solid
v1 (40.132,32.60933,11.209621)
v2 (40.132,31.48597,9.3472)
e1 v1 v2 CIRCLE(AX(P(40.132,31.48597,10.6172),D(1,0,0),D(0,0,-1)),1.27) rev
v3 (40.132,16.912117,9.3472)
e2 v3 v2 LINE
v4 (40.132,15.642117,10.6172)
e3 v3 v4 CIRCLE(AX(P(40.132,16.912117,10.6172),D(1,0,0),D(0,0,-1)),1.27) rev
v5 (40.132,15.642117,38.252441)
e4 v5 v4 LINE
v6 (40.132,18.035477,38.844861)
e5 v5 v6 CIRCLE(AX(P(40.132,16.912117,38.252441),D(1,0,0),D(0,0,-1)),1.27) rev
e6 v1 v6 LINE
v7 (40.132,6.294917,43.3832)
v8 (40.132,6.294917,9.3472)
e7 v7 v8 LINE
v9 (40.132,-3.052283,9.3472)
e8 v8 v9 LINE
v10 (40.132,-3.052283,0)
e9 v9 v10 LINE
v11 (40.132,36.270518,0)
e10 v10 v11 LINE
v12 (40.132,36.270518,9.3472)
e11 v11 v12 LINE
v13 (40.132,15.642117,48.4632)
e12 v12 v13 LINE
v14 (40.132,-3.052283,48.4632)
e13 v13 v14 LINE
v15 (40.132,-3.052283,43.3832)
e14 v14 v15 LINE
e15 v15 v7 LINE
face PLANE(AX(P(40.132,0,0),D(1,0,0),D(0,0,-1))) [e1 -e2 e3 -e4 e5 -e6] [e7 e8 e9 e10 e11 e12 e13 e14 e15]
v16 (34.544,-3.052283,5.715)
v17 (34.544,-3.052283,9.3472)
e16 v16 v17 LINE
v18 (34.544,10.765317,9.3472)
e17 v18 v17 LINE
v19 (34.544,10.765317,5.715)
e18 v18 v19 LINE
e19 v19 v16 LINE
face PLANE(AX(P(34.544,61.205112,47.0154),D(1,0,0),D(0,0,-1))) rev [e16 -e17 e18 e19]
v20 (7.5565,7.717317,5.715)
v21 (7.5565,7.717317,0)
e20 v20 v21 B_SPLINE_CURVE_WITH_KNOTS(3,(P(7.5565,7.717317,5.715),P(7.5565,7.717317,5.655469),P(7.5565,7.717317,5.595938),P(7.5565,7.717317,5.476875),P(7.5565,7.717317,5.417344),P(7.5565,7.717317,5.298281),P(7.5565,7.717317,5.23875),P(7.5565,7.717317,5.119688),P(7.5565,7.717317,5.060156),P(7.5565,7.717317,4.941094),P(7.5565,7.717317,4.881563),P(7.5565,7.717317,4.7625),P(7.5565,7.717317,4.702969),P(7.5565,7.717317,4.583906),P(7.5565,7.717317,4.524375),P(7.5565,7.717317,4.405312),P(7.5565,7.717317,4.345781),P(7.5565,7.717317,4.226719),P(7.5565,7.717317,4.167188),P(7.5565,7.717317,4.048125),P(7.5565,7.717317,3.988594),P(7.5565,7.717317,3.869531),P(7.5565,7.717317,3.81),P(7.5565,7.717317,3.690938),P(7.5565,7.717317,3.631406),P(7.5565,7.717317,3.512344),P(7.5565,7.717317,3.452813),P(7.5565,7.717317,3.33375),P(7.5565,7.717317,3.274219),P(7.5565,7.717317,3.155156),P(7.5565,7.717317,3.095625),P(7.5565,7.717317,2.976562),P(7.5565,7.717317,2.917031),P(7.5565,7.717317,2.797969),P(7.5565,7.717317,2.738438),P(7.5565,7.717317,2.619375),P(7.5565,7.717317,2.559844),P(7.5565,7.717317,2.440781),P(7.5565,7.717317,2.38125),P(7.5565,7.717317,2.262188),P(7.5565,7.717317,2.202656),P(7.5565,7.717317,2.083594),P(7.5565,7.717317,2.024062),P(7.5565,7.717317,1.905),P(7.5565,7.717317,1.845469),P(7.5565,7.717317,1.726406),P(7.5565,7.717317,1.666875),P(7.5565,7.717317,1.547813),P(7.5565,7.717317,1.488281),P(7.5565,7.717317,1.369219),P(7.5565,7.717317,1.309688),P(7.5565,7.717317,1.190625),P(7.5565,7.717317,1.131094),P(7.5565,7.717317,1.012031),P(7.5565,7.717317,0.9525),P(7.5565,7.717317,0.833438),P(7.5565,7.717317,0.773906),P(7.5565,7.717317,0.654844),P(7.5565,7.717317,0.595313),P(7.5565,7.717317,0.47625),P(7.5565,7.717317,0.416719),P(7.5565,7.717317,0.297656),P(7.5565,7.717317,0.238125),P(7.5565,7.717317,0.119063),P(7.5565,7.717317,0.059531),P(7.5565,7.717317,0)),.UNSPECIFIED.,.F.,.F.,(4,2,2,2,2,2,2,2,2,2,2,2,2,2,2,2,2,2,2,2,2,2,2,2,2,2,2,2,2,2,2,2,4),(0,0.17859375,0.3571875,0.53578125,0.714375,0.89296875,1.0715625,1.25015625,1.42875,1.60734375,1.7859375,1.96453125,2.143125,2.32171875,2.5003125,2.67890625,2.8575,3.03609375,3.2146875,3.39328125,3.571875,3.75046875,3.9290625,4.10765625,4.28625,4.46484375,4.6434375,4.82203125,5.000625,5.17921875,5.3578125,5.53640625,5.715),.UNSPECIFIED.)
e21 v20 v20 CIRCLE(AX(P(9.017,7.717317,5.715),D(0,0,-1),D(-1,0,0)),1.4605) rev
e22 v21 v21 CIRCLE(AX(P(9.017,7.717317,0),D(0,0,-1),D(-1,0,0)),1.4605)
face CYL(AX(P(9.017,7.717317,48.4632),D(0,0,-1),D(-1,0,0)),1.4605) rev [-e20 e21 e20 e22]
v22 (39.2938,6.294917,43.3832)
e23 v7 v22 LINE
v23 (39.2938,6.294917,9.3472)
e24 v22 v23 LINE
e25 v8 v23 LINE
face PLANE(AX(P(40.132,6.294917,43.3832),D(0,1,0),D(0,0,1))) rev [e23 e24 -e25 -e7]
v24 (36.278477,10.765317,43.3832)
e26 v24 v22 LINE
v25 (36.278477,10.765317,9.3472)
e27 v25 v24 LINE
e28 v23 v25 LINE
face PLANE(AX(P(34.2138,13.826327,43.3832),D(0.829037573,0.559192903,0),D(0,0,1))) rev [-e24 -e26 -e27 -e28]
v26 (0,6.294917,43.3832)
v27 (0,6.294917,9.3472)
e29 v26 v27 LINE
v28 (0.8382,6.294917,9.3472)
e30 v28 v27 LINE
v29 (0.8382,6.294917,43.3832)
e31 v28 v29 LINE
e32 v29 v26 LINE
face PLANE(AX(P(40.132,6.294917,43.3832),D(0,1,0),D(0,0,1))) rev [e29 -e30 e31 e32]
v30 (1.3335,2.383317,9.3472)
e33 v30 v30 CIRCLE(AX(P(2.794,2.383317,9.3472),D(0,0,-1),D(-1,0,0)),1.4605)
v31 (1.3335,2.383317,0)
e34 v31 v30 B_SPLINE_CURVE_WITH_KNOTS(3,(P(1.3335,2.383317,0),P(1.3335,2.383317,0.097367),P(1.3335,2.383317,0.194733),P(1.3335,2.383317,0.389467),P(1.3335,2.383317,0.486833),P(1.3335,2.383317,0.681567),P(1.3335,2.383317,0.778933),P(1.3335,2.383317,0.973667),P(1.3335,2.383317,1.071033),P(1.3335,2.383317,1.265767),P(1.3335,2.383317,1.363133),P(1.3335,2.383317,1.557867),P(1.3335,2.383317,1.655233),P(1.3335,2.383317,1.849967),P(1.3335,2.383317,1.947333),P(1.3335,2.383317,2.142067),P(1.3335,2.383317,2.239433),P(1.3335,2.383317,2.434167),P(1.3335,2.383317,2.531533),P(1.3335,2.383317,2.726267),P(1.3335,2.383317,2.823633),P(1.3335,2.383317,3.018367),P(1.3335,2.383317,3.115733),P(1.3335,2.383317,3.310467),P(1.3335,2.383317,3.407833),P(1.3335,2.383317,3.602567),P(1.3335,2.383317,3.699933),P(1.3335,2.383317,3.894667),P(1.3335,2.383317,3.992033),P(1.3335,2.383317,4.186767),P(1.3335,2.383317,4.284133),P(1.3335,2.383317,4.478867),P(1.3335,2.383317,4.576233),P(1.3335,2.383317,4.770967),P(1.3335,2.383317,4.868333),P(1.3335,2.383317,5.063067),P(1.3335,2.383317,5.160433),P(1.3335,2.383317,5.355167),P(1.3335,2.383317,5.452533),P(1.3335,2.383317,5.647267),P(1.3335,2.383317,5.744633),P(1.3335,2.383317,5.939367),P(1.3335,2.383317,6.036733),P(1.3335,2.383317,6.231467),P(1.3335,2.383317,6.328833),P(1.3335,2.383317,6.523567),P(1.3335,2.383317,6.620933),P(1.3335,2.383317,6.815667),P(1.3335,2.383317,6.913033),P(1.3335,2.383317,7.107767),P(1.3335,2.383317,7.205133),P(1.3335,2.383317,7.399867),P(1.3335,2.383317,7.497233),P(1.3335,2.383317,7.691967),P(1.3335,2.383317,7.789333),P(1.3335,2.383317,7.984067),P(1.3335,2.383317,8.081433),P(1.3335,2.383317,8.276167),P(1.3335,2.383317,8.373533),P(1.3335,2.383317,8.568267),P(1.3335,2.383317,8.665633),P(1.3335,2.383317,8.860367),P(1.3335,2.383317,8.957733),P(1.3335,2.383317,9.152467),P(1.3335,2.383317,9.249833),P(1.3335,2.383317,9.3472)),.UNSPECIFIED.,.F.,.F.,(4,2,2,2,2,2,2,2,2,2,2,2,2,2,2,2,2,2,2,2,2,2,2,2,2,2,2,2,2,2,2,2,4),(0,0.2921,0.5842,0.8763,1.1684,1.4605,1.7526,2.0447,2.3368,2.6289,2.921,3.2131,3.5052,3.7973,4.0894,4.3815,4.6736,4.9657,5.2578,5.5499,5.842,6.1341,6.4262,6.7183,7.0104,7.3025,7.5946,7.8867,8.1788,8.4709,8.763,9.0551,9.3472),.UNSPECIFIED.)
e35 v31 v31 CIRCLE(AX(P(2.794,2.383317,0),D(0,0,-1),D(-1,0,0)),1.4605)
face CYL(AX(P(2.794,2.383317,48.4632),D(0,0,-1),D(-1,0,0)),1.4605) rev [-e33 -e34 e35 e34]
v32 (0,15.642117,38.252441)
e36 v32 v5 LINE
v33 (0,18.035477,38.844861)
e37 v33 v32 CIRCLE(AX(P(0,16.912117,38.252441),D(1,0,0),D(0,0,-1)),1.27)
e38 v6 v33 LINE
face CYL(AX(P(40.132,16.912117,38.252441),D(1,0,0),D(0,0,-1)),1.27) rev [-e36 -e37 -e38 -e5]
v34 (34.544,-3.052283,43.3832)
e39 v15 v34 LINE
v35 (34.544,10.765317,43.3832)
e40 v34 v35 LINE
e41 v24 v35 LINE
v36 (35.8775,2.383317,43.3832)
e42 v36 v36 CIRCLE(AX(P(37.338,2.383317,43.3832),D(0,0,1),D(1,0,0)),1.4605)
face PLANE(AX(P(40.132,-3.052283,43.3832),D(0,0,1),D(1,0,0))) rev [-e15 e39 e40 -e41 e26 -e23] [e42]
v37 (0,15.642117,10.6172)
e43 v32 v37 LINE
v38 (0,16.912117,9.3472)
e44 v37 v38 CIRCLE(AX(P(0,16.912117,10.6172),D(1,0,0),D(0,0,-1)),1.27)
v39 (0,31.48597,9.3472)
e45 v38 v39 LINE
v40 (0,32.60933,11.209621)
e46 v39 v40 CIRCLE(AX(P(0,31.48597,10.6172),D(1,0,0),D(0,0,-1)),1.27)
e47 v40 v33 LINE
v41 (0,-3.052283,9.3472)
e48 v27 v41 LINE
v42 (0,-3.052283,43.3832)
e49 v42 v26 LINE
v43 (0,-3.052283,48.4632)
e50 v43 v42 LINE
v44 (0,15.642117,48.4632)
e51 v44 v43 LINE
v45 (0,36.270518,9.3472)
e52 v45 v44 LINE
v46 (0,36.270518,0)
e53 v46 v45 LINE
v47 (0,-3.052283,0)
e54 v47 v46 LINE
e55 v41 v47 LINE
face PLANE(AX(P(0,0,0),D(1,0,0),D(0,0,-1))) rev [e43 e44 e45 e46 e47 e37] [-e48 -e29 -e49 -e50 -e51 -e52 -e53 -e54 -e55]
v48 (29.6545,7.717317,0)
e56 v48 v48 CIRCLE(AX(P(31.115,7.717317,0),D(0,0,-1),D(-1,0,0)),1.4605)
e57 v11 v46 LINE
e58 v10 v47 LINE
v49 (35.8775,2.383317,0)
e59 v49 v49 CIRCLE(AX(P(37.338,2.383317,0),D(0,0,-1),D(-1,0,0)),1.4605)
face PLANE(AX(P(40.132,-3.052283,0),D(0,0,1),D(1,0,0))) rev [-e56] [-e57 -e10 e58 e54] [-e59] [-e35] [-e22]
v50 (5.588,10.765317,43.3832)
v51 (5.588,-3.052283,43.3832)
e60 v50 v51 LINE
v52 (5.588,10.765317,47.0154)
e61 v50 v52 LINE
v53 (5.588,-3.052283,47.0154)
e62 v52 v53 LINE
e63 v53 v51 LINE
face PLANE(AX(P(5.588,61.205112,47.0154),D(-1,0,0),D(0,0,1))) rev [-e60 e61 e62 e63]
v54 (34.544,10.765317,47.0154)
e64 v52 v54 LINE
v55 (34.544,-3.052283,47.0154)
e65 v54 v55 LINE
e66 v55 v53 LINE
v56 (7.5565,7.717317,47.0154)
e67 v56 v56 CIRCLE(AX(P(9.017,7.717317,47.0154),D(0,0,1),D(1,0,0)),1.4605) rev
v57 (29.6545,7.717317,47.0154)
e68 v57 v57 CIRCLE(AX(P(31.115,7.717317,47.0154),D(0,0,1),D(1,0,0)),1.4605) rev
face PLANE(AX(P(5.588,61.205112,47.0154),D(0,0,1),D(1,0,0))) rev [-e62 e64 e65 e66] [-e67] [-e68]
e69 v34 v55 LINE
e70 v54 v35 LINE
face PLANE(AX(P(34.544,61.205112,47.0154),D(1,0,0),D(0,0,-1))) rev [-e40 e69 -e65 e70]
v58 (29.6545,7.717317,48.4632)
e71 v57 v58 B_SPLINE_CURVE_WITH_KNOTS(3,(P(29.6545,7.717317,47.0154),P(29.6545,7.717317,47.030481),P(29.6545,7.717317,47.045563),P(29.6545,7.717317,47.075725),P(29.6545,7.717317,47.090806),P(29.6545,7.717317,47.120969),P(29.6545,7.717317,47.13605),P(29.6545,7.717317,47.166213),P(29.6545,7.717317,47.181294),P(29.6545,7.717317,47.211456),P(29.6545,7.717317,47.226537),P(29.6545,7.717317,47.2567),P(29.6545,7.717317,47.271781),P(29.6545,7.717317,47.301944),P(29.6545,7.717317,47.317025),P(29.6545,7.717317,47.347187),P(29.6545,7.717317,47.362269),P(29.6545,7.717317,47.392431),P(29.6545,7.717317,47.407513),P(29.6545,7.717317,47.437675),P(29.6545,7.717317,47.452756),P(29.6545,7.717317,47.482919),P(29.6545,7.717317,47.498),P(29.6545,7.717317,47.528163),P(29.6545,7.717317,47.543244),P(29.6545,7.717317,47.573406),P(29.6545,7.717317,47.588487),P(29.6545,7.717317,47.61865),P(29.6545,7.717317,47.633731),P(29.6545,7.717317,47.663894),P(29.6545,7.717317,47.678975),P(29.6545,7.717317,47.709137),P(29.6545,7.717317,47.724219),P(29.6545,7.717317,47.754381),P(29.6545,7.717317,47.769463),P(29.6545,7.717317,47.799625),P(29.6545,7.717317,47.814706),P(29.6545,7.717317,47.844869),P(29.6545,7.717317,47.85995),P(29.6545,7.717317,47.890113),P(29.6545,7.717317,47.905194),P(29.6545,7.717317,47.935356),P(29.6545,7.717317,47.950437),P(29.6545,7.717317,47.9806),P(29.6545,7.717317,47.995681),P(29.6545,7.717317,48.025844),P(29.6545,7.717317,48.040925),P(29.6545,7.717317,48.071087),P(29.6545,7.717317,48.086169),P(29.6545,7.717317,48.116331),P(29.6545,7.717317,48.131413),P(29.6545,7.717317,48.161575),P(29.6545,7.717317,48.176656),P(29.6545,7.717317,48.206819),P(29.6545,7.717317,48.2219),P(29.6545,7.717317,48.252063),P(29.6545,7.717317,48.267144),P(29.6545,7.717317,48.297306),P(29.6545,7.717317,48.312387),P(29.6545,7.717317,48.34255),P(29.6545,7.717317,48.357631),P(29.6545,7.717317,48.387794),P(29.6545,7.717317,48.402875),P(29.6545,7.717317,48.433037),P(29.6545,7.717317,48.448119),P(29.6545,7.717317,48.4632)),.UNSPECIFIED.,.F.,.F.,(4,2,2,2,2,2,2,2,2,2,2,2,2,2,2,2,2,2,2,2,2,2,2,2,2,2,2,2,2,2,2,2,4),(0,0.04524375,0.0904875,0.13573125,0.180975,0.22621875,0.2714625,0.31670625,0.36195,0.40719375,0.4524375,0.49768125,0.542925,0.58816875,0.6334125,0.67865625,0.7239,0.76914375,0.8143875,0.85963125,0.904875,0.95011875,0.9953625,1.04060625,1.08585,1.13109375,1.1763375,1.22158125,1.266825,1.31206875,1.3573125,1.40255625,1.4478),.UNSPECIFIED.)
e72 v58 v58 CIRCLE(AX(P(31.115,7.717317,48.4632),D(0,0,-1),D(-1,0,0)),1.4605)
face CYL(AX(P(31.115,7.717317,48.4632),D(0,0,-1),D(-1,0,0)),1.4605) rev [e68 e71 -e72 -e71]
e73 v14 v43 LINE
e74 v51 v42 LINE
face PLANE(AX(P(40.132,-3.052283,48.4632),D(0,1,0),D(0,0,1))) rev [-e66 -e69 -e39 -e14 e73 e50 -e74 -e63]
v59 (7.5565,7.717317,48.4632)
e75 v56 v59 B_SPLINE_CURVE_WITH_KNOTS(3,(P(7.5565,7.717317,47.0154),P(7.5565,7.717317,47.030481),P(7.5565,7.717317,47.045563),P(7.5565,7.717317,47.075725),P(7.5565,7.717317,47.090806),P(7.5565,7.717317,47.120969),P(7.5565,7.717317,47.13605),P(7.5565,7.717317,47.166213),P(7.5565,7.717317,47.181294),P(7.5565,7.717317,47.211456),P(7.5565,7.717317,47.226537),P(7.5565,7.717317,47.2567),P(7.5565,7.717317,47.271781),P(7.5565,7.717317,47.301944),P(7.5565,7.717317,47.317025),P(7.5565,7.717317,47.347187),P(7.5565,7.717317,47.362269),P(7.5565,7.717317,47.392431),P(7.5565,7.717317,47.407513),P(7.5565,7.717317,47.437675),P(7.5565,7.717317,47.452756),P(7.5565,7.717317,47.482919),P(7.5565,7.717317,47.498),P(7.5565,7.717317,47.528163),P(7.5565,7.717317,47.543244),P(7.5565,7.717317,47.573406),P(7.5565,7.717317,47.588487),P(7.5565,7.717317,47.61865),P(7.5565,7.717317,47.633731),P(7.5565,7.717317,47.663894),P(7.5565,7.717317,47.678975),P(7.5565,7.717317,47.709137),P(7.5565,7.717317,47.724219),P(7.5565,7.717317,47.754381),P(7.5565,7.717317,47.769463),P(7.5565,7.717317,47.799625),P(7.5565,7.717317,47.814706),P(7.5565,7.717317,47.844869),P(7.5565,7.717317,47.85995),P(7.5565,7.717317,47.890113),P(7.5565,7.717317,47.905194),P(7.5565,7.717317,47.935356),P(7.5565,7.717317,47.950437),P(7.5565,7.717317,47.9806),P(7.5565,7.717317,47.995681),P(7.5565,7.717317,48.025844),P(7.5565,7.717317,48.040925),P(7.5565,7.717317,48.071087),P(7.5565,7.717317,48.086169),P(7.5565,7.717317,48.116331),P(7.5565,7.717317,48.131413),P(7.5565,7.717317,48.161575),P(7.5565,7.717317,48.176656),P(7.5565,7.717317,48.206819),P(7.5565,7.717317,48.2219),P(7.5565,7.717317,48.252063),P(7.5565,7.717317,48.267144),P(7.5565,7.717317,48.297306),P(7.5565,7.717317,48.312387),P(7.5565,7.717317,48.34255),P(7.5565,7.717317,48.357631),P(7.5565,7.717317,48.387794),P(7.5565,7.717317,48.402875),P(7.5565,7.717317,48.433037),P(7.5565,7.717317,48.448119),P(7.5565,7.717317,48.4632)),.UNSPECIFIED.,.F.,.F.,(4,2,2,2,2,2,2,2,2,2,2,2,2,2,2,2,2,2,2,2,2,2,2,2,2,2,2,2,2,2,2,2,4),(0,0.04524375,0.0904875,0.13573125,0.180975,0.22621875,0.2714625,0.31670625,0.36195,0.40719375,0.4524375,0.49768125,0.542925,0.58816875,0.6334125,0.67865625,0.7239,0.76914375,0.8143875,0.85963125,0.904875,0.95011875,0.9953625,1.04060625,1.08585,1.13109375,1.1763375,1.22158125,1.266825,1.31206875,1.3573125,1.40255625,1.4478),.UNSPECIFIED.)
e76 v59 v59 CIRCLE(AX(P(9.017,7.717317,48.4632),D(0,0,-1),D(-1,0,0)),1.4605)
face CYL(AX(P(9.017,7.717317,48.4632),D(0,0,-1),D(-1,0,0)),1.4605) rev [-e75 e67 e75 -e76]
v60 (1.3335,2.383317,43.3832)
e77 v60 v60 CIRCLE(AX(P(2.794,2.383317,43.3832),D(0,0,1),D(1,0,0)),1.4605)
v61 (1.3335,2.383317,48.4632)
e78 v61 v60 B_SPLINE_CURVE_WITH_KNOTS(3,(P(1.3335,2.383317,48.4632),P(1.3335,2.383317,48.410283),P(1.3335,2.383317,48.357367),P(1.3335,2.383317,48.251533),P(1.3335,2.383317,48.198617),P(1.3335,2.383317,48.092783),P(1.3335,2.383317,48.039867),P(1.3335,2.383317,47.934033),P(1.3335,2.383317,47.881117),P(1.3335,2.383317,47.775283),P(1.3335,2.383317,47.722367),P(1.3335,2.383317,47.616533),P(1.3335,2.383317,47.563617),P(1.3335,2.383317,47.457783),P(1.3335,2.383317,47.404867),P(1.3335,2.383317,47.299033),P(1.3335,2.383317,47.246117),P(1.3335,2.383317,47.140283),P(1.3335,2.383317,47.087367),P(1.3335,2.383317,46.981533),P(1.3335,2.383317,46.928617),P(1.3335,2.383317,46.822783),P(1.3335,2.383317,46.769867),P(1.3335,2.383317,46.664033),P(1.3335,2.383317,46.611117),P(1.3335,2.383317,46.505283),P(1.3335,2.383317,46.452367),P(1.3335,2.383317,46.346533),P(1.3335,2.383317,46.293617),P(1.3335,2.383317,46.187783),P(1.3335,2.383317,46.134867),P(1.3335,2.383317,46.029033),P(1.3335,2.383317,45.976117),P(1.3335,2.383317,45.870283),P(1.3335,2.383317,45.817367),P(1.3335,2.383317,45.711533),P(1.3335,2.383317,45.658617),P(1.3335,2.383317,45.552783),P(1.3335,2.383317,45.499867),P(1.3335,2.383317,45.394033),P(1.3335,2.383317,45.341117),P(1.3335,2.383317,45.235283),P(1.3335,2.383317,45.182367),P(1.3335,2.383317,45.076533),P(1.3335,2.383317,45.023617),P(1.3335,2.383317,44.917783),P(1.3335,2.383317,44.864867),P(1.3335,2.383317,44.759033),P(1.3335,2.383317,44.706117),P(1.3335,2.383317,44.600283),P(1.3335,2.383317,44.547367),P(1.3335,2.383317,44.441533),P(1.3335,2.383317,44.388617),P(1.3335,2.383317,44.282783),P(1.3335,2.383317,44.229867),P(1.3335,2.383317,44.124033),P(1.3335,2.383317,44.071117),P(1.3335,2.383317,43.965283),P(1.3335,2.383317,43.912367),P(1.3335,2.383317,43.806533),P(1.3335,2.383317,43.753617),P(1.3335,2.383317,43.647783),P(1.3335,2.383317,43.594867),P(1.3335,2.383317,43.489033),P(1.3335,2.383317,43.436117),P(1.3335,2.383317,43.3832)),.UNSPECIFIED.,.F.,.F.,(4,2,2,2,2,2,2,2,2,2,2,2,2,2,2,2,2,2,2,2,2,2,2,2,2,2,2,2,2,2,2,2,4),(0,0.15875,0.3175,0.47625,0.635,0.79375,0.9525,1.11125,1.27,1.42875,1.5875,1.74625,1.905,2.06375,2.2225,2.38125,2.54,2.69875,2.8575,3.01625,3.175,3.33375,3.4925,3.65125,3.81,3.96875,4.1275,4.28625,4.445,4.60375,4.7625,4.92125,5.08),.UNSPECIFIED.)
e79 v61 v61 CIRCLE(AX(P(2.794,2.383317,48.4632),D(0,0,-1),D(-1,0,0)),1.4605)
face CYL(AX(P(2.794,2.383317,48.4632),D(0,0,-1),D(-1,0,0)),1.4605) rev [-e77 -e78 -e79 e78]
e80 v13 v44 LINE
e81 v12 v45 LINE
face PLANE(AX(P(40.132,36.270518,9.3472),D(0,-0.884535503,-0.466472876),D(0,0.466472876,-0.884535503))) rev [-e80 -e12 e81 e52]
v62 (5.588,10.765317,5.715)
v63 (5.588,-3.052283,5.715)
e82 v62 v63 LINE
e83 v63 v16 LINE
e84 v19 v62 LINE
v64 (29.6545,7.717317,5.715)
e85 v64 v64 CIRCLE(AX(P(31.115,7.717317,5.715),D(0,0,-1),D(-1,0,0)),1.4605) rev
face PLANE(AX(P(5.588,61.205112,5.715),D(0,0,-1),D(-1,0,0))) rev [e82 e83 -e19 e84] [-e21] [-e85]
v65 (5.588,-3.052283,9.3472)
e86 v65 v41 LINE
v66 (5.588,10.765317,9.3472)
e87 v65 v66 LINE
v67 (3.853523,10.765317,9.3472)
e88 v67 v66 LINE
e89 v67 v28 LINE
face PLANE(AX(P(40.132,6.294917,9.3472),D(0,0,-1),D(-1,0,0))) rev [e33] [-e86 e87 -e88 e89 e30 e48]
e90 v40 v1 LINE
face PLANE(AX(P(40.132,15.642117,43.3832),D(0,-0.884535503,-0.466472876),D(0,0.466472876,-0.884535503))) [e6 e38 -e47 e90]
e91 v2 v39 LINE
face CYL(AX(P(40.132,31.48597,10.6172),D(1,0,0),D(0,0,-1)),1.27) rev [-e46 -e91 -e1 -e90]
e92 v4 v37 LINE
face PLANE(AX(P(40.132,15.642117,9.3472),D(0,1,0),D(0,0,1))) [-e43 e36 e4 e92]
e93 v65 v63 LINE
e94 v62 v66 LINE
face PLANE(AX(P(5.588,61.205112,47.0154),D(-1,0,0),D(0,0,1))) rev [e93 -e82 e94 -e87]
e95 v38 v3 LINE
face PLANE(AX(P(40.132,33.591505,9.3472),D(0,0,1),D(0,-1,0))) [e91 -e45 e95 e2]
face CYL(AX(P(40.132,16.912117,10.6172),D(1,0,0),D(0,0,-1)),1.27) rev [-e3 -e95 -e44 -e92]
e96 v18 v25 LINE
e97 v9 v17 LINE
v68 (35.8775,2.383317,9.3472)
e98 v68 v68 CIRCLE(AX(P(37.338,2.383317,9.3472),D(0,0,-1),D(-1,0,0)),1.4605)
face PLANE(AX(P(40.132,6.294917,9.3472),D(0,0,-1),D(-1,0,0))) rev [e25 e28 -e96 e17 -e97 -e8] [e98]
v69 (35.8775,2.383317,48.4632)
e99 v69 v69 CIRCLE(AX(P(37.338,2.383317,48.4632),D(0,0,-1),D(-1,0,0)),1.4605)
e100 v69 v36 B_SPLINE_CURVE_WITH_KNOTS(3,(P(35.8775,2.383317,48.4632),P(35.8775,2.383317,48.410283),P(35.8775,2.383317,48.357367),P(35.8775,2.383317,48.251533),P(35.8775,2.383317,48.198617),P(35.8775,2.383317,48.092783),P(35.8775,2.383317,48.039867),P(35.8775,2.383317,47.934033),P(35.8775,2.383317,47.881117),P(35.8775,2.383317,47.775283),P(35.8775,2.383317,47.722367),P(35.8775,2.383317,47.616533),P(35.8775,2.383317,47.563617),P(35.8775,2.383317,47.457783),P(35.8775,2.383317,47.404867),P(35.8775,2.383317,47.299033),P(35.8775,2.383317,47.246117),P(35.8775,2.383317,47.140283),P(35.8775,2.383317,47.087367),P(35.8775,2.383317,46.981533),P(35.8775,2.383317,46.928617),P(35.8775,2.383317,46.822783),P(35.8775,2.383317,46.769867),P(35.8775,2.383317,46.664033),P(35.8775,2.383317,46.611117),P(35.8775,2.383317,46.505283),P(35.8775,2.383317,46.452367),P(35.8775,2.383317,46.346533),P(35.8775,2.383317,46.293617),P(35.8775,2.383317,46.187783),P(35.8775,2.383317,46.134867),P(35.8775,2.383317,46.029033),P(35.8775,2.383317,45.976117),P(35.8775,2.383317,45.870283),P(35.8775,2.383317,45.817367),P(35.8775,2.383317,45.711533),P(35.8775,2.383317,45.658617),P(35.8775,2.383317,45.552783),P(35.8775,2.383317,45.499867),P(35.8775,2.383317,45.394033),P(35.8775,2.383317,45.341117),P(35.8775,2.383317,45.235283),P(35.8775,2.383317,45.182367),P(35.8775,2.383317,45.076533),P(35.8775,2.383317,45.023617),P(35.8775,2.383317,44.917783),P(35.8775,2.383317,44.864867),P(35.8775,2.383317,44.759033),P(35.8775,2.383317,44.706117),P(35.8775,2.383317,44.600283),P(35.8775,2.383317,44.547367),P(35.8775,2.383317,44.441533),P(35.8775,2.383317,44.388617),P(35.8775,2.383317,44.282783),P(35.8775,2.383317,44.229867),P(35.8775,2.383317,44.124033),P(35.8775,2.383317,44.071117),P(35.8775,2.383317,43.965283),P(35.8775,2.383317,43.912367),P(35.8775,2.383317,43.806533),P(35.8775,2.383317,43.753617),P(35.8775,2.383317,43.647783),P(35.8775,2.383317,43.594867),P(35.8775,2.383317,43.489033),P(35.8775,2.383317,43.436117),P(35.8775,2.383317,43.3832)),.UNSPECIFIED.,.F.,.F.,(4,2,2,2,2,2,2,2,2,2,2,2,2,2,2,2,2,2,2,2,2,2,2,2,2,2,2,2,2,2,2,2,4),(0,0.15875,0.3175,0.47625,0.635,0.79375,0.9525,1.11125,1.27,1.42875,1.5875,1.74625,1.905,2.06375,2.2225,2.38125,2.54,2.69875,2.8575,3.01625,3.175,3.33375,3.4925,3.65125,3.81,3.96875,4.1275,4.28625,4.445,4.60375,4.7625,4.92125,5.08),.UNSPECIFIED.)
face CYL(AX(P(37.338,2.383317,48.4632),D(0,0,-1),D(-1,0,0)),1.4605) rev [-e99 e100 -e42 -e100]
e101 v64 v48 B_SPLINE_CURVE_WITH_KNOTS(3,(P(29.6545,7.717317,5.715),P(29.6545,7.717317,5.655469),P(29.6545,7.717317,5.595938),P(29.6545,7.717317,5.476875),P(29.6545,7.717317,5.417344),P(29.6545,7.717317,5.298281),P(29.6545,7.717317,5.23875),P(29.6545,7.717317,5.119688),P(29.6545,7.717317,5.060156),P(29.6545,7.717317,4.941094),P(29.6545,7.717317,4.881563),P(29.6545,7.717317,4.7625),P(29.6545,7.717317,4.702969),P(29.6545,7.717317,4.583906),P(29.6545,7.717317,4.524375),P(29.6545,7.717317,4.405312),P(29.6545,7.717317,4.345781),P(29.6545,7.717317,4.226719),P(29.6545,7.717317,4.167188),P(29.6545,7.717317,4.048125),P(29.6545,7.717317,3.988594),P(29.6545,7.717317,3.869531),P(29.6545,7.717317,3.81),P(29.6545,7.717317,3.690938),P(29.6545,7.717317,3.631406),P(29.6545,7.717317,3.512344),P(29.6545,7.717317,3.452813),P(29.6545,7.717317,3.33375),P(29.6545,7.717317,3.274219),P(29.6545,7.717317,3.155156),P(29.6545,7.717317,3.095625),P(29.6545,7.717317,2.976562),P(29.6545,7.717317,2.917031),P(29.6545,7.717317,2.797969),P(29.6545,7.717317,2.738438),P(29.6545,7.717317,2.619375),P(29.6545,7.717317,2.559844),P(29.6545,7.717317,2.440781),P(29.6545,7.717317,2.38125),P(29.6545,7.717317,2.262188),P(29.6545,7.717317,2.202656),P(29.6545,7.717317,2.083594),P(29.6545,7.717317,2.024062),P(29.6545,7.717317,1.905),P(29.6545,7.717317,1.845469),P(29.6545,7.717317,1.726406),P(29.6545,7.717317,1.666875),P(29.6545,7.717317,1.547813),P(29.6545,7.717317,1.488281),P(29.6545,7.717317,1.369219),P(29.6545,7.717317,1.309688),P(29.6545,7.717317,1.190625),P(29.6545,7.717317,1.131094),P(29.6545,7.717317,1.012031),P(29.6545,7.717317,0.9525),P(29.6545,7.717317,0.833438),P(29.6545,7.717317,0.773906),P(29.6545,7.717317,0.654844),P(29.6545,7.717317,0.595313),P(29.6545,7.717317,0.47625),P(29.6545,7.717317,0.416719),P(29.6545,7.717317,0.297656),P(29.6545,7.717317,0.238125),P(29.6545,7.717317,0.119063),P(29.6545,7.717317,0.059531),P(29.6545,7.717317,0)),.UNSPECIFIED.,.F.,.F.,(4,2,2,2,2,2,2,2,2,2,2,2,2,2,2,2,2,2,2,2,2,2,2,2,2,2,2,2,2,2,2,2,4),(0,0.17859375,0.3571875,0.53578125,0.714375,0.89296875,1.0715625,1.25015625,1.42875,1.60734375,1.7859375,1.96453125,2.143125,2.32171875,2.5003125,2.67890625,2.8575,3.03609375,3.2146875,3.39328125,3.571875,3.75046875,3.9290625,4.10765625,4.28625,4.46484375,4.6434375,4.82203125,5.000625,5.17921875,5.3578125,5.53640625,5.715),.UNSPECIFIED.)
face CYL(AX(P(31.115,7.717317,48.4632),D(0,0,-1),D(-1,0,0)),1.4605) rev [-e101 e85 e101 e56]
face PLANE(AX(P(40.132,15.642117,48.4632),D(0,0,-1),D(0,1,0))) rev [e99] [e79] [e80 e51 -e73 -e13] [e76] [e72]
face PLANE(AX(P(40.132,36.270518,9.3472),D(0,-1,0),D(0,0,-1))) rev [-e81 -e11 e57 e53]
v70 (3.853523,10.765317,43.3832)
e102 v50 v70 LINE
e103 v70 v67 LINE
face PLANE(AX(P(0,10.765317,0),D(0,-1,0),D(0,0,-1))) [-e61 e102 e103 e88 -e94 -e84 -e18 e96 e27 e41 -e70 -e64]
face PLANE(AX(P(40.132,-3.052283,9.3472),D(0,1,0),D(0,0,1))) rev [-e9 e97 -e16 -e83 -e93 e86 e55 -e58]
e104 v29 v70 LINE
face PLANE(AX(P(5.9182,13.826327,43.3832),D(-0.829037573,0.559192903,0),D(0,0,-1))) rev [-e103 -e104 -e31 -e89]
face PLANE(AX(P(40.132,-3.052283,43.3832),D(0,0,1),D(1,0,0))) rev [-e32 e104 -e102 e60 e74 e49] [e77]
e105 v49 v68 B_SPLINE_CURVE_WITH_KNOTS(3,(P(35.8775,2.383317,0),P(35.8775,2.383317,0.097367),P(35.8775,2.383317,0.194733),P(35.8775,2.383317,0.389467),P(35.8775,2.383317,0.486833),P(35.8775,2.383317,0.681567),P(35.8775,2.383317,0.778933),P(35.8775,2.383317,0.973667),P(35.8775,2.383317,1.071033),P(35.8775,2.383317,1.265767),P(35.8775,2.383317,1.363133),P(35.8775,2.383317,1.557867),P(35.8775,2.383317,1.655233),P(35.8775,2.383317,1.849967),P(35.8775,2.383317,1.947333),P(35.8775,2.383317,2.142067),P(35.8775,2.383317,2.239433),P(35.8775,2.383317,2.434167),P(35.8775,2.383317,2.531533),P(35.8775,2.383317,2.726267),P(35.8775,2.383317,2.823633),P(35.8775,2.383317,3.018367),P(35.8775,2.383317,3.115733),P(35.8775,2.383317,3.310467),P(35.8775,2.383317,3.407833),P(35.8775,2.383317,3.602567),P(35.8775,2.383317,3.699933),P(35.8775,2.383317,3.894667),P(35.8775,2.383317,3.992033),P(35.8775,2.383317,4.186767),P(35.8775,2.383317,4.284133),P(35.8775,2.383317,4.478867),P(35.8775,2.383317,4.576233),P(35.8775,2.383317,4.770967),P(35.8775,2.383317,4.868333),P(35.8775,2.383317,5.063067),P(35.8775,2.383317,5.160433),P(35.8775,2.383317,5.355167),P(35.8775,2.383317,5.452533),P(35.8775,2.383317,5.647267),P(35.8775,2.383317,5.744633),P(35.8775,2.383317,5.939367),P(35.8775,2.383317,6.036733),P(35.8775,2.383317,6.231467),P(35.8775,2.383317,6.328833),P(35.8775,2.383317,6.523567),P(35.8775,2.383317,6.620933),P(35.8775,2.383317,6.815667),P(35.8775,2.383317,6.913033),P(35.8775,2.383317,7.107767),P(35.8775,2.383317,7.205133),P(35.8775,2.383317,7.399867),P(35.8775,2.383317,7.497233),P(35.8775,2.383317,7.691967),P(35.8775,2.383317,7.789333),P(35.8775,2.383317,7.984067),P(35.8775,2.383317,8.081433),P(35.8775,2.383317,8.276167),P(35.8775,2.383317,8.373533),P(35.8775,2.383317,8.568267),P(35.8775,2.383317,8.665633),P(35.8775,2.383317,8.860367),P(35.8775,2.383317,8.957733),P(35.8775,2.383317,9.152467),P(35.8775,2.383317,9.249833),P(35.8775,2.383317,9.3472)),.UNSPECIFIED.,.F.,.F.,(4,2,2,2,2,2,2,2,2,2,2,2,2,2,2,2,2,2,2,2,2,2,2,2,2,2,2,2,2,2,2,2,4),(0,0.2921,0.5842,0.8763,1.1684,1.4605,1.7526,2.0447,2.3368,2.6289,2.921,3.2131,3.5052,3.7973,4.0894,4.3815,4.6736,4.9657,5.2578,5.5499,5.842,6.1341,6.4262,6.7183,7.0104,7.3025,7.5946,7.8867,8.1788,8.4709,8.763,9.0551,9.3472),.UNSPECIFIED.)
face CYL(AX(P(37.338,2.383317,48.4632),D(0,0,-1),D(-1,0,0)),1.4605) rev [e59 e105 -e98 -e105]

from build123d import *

# Parameters (mm, degrees)
BOSS_EXTRUDE1_DEPTH = 40.132
FILLET1_R           = 1.27
SKETCH2_W           = 28.2956
SKETCH2_H           = 34.036
CUT_EXTRUDE1_DEPTH  = 4.4704
CHAMFER1_SIZE       = 5.08
CHAMFER1_SIZE_2     = 7.53140972
SKETCH3_R           = 1.4605
CUT_EXTRUDE2_DEPTH  = 73.627884767
CUT_EXTRUDE4_REACH  = 76.199
SKETCH4_W           = 28.956
SKETCH4_H           = 41.3004


with BuildPart() as part:
    # Sketch1 → Boss-Extrude1 (new body)
    with BuildSketch(Plane(origin=(0, 0, 0), x_dir=(0, 0, -1), z_dir=(1, 0, 0))):
        Polygon((0, -3.052283086), (0, 36.270517883), (-9.3472, 36.270517883), (-48.4632, 15.642116914), (-48.4632, -3.052283086), (-43.3832, -3.052283086), (-43.3832, 6.294916914), (-9.3472, 6.294916914), (-9.3472, -3.052283086), align=None)
        Polygon((-43.3832, 15.642116914), (-9.3472, 33.59150477), (-9.3472, 15.642116914), align=None, mode=Mode.SUBTRACT)
    extrude(amount=BOSS_EXTRUDE1_DEPTH)

    # Fillet1
    fillet1_edges = [part.edges().sort_by_distance(p)[0] for p in [
        (20.066, 15.642116914, 43.3832),
        (20.066, 15.642116914, 9.3472),
        (20.066, 33.59150477, 9.3472),
    ]]
    fillet(fillet1_edges, radius=FILLET1_R)

    # Sketch2 → Cut-Extrude1 (cut)
    with BuildSketch(Plane.XZ.offset(-6.294916914)):
        with Locations((20.066, 26.3652)):
            Rectangle(SKETCH2_W, SKETCH2_H)
    extrude(amount=-CUT_EXTRUDE1_DEPTH, mode=Mode.SUBTRACT)

    # Chamfer1
    # the kernel refuses this chamfer: 7.53140972, 5.08 mm, written as the material it takes off along each edge
    with BuildSketch(Plane(origin=(5.9182, 6.294916914, 9.3472), x_dir=(-0.9988697089125115, -0.04753214298802862, 0), z_dir=(0, 0, 1))) as chamfer1_piece_1_section:
        Polygon((CHAMFER1_SIZE * 0.998869708913, -CHAMFER1_SIZE * 0.047532142988), (-CHAMFER1_SIZE_2 * 0.0475321429883, -CHAMFER1_SIZE_2 * 0.998869708918), (0, 0), align=None)
    chamfer1_piece_1 = extrude(amount=34.036, mode=Mode.PRIVATE)
    chamfer1_piece_1 = split(chamfer1_piece_1, bisect_by=Plane(origin=(4.025982399, 10.765316914, 26.3652), z_dir=(0, -1, 0)), keep=Keep.TOP, mode=Mode.PRIVATE)
    add(chamfer1_piece_1, mode=Mode.SUBTRACT)
    with BuildSketch(Plane(origin=(34.2138, 6.294916914, 43.3832), x_dir=(0.9988697089125117, -0.0475321429880285, 0), z_dir=(0, 0, -1))) as chamfer1_piece_2_section:
        Polygon((CHAMFER1_SIZE * 0.998869708913, -CHAMFER1_SIZE * 0.047532142988), (-CHAMFER1_SIZE_2 * 0.0475321429883, -CHAMFER1_SIZE_2 * 0.998869708918), (0, 0), align=None)
    chamfer1_piece_2 = extrude(amount=34.036, mode=Mode.PRIVATE)
    chamfer1_piece_2 = split(chamfer1_piece_2, bisect_by=Plane(origin=(36.106017601, 10.765316914, 26.3652), z_dir=(0, -1, 0)), keep=Keep.TOP, mode=Mode.PRIVATE)
    add(chamfer1_piece_2, mode=Mode.SUBTRACT)

    # Sketch3 → Cut-Extrude2 (cut, through all)
    with BuildSketch(Plane(origin=(0, 0, 0), x_dir=(-1, 0, 0), z_dir=(0, 0, -1))):
        with Locations((-37.338, 2.383316914)):
            Circle(SKETCH3_R)
        with Locations((-31.115, 7.717316914)):
            Circle(SKETCH3_R)
        with Locations((-9.017, 7.717316914)):
            Circle(SKETCH3_R)
        with Locations((-2.794, 2.383316914)):
            Circle(SKETCH3_R)
    extrude(amount=-CUT_EXTRUDE2_DEPTH, mode=Mode.SUBTRACT)

    # Cut-Extrude4: up to this face of the body (flat: up to its plane)
    cut_extrude4_end = Plane(part.part.faces().sort_by_distance((20.066, 10.765316914, 26.3652))[0])
    # Sketch4 → Cut-Extrude4 (cut, up to the picked face)
    with BuildSketch(Plane.XZ.offset(3.052283086), mode=Mode.PRIVATE) as cut_extrude4_sk1:
        with Locations((20.066, 26.3652)):
            Rectangle(SKETCH4_W, SKETCH4_H)
    cut_extrude4_tool1 = split(extrude(cut_extrude4_sk1.sketch, amount=-CUT_EXTRUDE4_REACH, mode=Mode.PRIVATE), bisect_by=cut_extrude4_end, keep=Keep.BOTH, mode=Mode.PRIVATE)
    add(cut_extrude4_tool1.solids().sort_by(Axis((20.066, -3.052283, 26.3652), (0, 1, 0)))[0], mode=Mode.SUBTRACT)


solid = part.part
